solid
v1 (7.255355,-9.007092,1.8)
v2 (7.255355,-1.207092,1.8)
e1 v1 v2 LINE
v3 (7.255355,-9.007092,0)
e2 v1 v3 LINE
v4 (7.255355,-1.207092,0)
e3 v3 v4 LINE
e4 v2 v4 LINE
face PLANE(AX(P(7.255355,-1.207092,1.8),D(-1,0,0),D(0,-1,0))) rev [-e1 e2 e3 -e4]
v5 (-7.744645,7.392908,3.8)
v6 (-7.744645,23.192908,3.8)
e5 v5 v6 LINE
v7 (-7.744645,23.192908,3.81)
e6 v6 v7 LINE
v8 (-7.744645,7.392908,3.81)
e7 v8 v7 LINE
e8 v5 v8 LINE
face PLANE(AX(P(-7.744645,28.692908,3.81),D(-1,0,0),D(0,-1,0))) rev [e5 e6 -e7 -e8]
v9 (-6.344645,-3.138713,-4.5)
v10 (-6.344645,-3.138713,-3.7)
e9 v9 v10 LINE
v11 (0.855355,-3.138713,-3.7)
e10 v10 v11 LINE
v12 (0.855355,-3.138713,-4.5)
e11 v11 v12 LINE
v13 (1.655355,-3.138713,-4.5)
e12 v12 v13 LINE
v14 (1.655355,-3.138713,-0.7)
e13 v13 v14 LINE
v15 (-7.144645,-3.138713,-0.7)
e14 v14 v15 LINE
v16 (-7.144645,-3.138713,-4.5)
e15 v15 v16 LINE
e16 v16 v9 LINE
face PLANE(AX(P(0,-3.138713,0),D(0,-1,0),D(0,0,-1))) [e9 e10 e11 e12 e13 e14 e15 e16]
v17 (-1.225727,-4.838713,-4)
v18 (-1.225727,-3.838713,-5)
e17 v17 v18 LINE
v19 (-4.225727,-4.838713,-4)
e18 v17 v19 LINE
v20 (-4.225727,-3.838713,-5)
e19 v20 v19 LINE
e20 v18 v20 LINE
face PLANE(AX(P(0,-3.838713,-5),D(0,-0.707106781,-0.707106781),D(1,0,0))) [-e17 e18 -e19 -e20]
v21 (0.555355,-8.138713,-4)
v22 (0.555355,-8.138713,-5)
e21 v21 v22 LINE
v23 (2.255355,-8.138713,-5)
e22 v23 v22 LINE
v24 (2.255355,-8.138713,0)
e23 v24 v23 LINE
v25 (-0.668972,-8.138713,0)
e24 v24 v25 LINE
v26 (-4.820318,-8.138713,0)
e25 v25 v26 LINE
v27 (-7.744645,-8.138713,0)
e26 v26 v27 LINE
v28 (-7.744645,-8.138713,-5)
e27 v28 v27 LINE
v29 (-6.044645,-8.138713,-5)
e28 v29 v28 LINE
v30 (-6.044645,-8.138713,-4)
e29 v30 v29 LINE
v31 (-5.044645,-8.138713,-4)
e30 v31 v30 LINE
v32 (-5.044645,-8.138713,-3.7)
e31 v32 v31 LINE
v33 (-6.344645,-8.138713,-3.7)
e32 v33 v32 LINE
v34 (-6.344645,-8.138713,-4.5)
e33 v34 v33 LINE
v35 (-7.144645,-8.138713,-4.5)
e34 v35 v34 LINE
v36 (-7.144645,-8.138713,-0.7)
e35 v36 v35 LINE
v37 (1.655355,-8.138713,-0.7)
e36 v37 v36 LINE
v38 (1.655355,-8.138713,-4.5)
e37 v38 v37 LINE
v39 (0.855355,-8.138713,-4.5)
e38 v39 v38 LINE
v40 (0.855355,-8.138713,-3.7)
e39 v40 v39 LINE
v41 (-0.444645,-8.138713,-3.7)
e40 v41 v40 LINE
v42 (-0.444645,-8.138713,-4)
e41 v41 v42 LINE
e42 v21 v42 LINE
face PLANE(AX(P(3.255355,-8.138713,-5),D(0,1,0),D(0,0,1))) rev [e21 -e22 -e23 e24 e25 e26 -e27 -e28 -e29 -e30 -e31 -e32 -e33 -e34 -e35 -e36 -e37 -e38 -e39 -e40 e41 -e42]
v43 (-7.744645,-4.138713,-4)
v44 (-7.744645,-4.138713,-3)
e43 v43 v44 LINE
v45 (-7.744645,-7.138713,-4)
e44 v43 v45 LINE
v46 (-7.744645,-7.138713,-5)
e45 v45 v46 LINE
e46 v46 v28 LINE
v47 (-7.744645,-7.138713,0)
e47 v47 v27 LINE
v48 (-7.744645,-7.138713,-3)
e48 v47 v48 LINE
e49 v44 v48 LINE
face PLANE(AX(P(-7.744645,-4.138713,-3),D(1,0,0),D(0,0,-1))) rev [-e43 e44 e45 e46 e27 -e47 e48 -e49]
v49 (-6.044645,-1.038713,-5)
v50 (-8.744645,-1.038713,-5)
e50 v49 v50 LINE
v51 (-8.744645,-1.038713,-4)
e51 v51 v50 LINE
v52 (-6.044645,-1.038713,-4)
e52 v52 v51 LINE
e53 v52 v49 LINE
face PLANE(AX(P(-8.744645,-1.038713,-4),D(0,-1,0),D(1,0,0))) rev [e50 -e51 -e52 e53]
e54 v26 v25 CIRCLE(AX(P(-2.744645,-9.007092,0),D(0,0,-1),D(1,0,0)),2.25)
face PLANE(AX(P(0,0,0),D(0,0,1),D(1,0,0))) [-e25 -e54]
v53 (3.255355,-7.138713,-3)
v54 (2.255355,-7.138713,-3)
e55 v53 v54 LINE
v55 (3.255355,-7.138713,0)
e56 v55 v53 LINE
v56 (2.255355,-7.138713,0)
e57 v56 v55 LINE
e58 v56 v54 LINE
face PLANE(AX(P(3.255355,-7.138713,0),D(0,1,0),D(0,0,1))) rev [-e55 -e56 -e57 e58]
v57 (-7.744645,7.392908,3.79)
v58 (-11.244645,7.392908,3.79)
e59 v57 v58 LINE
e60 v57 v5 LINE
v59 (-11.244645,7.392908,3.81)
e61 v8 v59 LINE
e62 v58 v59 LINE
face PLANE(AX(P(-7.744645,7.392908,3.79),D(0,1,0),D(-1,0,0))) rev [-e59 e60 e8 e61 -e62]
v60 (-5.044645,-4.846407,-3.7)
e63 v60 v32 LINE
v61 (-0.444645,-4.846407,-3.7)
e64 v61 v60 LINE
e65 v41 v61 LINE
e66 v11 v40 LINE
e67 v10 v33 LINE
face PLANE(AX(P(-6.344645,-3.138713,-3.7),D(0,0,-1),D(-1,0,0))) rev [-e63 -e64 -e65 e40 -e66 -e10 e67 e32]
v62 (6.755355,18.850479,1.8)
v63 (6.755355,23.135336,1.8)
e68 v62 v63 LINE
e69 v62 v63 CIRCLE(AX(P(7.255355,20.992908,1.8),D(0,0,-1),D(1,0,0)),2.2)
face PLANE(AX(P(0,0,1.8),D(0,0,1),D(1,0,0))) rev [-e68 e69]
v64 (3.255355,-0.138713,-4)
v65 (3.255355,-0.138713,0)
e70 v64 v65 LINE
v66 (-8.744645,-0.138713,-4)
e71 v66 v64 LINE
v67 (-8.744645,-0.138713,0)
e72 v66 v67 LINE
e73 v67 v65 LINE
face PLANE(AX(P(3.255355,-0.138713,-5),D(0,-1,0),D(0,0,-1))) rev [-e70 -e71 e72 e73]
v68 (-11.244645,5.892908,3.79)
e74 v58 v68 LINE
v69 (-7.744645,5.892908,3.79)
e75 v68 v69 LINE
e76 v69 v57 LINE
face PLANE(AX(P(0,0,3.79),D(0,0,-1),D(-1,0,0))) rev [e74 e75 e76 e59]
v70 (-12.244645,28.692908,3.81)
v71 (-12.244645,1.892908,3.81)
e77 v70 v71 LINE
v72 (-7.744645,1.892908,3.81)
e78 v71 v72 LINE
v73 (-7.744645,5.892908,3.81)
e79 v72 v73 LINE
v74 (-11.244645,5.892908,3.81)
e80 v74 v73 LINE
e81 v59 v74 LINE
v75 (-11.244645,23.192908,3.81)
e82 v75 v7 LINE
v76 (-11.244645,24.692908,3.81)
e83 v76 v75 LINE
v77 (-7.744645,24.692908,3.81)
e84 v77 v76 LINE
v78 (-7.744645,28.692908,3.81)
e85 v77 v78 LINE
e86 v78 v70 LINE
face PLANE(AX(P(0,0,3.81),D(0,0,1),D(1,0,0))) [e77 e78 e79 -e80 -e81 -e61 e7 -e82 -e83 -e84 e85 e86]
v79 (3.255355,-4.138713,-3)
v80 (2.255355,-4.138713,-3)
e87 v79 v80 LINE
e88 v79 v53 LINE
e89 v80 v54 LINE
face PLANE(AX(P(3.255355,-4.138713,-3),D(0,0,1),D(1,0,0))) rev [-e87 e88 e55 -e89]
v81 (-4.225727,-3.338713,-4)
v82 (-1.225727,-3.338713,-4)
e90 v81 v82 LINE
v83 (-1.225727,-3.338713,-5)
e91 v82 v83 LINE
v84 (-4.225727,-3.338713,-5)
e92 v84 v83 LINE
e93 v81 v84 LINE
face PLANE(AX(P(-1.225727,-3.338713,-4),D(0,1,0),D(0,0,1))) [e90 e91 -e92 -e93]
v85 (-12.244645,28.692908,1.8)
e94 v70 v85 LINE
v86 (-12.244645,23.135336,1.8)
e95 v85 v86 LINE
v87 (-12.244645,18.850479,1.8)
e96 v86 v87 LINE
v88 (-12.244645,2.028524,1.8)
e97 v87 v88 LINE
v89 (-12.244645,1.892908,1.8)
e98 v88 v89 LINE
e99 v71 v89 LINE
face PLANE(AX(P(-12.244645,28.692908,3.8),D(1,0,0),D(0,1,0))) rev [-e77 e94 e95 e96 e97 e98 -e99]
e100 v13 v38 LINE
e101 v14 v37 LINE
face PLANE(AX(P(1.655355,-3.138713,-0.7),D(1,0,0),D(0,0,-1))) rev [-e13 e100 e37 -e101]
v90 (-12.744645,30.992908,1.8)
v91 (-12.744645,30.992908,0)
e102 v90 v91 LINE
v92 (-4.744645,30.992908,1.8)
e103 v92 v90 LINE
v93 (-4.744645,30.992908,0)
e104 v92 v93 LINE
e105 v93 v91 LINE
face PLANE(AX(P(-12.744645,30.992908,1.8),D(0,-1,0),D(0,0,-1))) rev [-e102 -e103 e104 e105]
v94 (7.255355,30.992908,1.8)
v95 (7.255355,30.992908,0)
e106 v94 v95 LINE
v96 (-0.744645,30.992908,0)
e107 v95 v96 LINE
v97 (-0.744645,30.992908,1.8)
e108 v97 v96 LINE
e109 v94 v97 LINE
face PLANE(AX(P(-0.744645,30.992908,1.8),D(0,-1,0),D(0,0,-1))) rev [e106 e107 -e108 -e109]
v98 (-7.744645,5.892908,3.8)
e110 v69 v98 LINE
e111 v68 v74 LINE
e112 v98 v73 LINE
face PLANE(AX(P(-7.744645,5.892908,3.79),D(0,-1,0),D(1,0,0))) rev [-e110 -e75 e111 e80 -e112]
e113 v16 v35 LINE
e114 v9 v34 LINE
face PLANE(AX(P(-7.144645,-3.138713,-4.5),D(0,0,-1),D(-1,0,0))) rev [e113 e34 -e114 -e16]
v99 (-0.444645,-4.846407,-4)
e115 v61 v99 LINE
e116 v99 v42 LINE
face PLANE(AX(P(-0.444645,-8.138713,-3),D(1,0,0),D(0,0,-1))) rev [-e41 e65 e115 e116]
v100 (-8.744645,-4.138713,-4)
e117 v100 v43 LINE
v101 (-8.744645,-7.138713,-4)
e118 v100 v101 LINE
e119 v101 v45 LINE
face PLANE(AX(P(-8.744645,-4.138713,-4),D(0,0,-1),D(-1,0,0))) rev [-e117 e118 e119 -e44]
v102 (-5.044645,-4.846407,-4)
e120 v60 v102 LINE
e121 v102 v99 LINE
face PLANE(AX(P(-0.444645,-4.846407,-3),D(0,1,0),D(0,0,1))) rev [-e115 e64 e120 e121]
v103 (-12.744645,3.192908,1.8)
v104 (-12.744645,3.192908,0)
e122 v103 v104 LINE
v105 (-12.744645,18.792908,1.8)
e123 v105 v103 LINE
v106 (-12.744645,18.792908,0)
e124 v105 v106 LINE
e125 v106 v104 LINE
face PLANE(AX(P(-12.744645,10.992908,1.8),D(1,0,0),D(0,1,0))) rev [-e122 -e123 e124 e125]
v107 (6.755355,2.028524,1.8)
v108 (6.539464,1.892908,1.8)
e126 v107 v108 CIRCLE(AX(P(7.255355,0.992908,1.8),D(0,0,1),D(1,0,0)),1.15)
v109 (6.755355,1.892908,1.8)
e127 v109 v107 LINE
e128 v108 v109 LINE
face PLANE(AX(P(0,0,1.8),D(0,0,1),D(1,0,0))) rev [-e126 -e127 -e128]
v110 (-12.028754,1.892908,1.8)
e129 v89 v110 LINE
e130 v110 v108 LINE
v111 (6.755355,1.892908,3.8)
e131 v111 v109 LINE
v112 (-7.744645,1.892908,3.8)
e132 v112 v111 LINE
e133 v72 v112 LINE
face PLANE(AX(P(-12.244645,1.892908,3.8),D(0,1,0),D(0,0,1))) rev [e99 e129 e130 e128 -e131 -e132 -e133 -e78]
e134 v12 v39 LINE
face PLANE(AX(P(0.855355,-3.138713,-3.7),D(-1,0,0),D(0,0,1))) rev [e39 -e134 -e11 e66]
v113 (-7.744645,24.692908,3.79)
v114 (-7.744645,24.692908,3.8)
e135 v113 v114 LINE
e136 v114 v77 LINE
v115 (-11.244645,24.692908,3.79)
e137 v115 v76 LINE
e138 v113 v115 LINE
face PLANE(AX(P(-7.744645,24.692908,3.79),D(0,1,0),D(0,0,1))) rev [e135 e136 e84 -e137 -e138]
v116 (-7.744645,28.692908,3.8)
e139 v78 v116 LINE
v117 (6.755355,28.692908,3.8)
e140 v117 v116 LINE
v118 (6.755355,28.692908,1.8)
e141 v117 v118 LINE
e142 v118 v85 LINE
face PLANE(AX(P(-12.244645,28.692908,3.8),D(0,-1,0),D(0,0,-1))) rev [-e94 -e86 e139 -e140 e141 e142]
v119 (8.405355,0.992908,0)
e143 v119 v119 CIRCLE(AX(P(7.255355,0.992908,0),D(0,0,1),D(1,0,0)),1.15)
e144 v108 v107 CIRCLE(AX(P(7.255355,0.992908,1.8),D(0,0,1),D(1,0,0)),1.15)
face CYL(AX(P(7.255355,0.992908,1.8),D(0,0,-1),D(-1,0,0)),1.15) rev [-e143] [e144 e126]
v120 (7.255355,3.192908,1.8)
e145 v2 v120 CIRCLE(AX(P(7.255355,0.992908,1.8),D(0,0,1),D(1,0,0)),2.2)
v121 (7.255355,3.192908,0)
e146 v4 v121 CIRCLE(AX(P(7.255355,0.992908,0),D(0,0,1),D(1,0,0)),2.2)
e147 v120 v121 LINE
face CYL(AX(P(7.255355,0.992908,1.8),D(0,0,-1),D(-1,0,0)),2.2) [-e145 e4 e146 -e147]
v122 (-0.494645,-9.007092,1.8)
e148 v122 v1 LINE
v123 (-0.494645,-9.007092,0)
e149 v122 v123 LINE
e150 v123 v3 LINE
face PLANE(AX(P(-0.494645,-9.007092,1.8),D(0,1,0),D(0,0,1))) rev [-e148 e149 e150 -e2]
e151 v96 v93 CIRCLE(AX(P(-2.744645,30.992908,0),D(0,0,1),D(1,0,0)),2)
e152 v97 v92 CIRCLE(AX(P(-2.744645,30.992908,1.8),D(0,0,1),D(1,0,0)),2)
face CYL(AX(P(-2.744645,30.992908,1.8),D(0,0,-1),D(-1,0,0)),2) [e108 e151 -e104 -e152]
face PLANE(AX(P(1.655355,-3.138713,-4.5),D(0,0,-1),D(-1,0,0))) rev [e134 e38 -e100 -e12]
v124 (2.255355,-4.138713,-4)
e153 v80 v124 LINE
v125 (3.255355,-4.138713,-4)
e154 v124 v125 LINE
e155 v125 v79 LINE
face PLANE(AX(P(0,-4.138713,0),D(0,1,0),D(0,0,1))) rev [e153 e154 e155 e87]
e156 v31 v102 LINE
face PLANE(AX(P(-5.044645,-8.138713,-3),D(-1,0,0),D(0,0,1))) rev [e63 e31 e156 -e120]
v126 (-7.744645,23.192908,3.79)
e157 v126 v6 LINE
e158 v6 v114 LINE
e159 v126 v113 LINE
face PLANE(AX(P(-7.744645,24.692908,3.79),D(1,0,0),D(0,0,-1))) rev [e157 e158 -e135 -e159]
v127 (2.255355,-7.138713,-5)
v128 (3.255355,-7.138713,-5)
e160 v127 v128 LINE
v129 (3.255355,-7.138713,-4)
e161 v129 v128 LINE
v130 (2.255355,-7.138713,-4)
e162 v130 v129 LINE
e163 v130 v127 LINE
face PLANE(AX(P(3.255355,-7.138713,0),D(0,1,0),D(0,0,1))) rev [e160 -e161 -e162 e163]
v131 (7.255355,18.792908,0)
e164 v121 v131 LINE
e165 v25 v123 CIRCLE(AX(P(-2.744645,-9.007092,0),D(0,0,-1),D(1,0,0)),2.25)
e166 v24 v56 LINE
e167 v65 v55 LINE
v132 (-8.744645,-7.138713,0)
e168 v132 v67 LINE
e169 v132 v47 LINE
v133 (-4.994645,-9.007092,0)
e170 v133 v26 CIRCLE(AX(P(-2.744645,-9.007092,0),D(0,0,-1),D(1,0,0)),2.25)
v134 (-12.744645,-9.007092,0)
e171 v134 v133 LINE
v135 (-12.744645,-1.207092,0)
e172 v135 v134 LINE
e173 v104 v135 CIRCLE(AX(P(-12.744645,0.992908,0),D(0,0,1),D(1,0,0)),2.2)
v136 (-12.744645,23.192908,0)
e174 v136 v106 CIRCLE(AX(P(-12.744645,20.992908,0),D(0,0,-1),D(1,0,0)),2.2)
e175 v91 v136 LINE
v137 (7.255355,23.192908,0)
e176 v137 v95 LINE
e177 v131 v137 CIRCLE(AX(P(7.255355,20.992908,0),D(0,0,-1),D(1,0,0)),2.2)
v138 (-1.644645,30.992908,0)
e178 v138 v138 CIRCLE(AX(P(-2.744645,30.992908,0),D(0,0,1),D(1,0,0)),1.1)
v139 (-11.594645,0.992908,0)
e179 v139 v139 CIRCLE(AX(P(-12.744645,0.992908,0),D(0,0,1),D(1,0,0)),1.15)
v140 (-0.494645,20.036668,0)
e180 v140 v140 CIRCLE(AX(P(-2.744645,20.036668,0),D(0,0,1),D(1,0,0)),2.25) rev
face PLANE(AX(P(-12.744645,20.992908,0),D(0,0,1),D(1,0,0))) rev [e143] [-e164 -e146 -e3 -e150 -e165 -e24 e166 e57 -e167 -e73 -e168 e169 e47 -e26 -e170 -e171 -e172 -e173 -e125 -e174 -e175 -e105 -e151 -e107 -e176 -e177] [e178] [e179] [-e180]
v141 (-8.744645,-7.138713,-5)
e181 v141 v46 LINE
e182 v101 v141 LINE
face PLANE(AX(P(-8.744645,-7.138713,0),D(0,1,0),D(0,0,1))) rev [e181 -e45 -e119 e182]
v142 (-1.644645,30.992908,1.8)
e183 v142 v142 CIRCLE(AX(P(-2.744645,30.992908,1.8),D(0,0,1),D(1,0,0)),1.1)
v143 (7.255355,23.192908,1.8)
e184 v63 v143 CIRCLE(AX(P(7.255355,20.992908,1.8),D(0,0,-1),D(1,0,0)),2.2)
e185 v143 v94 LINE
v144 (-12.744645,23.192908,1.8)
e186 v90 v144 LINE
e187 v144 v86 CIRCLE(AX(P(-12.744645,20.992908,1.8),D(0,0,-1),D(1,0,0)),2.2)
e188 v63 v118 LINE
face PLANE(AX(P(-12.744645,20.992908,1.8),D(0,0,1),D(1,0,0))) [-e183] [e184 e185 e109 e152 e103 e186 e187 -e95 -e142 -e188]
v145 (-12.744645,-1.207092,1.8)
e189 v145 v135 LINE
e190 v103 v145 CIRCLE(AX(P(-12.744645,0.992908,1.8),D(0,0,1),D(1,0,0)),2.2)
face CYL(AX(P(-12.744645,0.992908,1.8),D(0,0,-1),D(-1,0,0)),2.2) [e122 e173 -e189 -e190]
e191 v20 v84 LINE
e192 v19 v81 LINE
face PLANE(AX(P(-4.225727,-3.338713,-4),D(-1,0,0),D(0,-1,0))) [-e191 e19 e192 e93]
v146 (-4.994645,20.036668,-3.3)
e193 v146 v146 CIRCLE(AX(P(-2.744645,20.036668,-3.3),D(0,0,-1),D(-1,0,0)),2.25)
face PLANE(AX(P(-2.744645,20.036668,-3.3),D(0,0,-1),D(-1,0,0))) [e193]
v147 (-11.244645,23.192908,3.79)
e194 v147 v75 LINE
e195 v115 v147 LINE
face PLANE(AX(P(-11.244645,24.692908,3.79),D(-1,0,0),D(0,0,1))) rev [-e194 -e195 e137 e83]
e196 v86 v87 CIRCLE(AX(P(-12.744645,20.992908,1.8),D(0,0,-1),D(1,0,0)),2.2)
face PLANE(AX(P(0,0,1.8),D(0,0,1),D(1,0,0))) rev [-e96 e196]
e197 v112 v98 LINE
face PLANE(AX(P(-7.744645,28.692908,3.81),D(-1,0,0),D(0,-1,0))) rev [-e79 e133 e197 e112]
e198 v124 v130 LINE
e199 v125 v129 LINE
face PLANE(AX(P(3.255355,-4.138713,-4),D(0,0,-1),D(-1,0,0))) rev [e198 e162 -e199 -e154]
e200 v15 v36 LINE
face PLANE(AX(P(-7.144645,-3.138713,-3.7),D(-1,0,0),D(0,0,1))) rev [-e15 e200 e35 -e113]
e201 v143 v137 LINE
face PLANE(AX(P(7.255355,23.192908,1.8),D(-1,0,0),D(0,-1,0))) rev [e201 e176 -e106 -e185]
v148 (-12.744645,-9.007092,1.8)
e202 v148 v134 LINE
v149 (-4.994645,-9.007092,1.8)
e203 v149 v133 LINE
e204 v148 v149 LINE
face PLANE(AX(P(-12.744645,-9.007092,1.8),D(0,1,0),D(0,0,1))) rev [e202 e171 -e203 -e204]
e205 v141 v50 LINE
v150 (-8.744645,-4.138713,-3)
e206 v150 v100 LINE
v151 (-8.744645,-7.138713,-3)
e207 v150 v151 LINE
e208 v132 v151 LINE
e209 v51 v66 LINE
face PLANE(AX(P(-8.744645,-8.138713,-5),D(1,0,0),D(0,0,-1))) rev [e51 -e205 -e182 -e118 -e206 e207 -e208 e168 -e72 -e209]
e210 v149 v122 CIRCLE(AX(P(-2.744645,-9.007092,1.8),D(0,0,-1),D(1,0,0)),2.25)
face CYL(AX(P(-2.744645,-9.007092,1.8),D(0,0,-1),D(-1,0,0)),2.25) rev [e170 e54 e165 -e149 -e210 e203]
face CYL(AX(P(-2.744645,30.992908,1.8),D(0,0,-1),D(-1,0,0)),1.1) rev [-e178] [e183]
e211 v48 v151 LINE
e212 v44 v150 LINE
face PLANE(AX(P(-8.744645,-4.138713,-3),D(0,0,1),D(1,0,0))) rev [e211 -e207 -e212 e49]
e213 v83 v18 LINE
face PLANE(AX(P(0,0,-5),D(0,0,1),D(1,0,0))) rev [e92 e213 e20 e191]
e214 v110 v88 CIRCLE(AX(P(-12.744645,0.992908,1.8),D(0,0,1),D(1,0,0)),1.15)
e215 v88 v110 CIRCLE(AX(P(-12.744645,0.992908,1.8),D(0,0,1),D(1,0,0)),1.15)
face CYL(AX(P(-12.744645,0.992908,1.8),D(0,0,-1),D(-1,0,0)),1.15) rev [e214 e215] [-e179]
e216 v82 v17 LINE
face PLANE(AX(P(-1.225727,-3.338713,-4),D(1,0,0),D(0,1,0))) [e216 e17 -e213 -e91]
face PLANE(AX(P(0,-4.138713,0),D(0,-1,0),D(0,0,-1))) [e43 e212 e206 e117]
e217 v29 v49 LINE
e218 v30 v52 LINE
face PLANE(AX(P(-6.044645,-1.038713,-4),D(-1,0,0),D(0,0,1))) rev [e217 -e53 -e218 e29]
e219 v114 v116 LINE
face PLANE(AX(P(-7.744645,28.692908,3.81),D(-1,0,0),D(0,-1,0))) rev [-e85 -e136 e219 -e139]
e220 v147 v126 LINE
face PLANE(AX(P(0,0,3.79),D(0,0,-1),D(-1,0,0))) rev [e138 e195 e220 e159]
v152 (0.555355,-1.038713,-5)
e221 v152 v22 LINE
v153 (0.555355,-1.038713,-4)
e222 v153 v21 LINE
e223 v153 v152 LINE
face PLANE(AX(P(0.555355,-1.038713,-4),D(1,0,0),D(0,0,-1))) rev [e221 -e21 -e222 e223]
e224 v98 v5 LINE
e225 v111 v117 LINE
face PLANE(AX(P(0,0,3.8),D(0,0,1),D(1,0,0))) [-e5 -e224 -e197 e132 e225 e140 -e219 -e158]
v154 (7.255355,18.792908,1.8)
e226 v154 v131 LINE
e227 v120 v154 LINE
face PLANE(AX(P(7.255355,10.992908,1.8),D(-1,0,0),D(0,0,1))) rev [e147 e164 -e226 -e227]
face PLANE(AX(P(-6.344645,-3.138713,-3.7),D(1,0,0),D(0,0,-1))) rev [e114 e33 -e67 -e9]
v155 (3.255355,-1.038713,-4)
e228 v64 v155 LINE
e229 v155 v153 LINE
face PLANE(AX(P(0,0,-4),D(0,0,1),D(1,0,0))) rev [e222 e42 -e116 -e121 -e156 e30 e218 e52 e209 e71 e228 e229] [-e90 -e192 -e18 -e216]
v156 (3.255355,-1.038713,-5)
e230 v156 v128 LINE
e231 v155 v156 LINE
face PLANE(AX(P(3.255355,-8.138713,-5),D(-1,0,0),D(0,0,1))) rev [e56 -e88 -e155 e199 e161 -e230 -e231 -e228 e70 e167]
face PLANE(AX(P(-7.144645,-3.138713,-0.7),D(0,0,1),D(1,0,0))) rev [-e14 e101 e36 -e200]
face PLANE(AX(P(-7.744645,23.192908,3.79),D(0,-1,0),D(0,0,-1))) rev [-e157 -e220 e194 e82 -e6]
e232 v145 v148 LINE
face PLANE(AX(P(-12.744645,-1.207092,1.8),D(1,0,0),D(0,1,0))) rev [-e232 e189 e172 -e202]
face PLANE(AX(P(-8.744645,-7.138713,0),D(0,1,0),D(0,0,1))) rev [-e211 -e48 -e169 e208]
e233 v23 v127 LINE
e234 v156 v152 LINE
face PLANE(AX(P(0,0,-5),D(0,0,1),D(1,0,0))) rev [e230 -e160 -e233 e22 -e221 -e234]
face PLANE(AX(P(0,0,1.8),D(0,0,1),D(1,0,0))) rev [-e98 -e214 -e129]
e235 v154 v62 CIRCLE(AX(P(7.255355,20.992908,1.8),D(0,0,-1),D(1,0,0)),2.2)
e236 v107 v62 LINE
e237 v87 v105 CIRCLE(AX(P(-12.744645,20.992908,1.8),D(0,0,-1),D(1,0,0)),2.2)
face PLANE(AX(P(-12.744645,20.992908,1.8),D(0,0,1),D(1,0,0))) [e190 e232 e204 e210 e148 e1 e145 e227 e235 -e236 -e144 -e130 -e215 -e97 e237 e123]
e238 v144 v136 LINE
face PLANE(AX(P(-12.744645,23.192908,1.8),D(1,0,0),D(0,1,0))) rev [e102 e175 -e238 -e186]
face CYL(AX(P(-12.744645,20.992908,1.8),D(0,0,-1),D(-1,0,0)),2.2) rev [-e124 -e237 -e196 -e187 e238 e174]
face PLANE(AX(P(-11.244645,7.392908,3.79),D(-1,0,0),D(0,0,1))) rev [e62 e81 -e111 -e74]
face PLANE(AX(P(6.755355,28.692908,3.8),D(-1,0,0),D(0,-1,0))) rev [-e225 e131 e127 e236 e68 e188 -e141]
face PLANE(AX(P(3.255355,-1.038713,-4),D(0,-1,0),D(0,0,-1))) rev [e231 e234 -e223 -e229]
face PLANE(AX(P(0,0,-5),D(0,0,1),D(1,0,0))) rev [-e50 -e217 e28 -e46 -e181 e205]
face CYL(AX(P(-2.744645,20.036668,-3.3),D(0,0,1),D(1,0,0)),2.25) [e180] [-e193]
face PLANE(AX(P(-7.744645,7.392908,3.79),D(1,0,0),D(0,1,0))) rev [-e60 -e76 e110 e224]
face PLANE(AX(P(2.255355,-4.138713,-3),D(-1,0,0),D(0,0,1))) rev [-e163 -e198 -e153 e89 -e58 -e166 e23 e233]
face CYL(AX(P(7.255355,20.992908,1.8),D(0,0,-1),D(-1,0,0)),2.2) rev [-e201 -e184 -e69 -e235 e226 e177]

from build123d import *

# Parameters (mm, degrees)
ESQUISSE1_R             = 1.15
ESQUISSE1_R_2           = 1.1
BOSS_EXTRU_1_DEPTH      = 1.8
ESQUISSE2_W             = 19
ESQUISSE2_H             = 26.8
BOSS_EXTRU_2_DEPTH      = 2
ESQUISSE3_W             = 4.5
ESQUISSE3_H             = 26.8
BOSS_EXTRU_3_DEPTH      = 0.01
ESQUISSE4_W             = 3.5
ESQUISSE4_H             = 1.5
ENL_V_MAT_EXTRU_1_DEPTH = 0.02
ESQUISSE5_W             = 12
ESQUISSE5_H             = 8
BOSS_EXTRU_4_DEPTH      = 5
ESQUISSE6_W             = 3
ESQUISSE6_H             = 1.5
ENL_V_MAT_EXTRU_2_DEPTH = 1
ESQUISSE8_W             = 4.6
ESQUISSE8_H             = 3.292306134
ENL_V_MAT_EXTRU_3_DEPTH = 1
CHANFREIN1_SIZE         = 1
ENL_V_MAT_EXTRU_4_DEPTH = 5
ESQUISSE10_W            = 1
ESQUISSE10_H            = 1
ENL_V_MAT_EXTRU_5_DEPTH = 4
ESQUISSE11_W            = 1
ESQUISSE11_H            = 1
ENL_V_MAT_EXTRU_7_DEPTH = 5
ESQUISSE12_R            = 2.25
BOSS_EXTRU_5_DEPTH      = 3.3


with BuildPart() as part:
    # Esquisse1 → Boss.-Extru.1 (new body)
    with BuildSketch(Plane.XY):
        with BuildLine():
            Line((-12.744645331, 10.992907801), (-12.744645331, 3.192907801))
            ThreePointArc((-12.744645331, 3.192907801), (-14.944645331, 0.992907801), (-12.744645331, -1.207092199))
            Line((-12.744645331, -1.207092199), (-12.744645331, -9.007092199))
            Line((-12.744645331, -9.007092199), (-4.994645331, -9.007092199))
            ThreePointArc((-4.994645331, -9.007092199), (-2.744645331, -6.757092199), (-0.494645331, -9.007092199))
            Line((-0.494645331, -9.007092199), (7.255354669, -9.007092199))
            Line((7.255354669, -9.007092199), (7.255354669, -1.207092199))
            ThreePointArc((7.255354669, -1.207092199), (9.455354669, 0.992907801), (7.255354669, 3.192907801))
            Line((7.255354669, 3.192907801), (7.255354669, 10.992907801))
            Line((7.255354669, 10.992907801), (7.255354669, 18.792907801))
            ThreePointArc((7.255354669, 18.792907801), (5.055354669, 20.992907801), (7.255354669, 23.192907801))
            Line((7.255354669, 23.192907801), (7.255354669, 30.992907801))
            Line((7.255354669, 30.992907801), (-0.744645331, 30.992907801))
            ThreePointArc((-0.744645331, 30.992907801), (-2.744645331, 32.992907801), (-4.744645331, 30.992907801))
            Line((-4.744645331, 30.992907801), (-12.744645331, 30.992907801))
            Line((-12.744645331, 30.992907801), (-12.744645331, 23.192907801))
            ThreePointArc((-12.744645331, 23.192907801), (-10.544645331, 20.992907801), (-12.744645331, 18.792907801))
            Line((-12.744645331, 18.792907801), (-12.744645331, 10.992907801))
        make_face()
        with Locations((-12.744645331, 0.992907801)):
            Circle(ESQUISSE1_R, mode=Mode.SUBTRACT)
        with Locations((7.255354669, 0.992907801)):
            Circle(ESQUISSE1_R, mode=Mode.SUBTRACT)
        with Locations((-2.744645331, 30.992907801)):
            Circle(ESQUISSE1_R_2, mode=Mode.SUBTRACT)
    extrude(amount=BOSS_EXTRU_1_DEPTH)

    # Esquisse2 → Boss.-Extru.2 (add)
    with BuildSketch(Plane.XY.offset(1.8)):
        with Locations((-2.744645331, 15.292907801)):
            Rectangle(ESQUISSE2_W, ESQUISSE2_H)
    extrude(amount=BOSS_EXTRU_2_DEPTH)

    # Esquisse3 → Boss.-Extru.3 (add)
    with BuildSketch(Plane.XY.offset(3.8)):
        with Locations((-9.994645331, 15.292907801)):
            Rectangle(ESQUISSE3_W, ESQUISSE3_H)
    extrude(amount=BOSS_EXTRU_3_DEPTH)

    # Esquisse4 → Enlèv. mat.-Extru.1 (cut)
    with BuildSketch(Plane.XY.offset(3.81)):
        with Locations((-9.494645331, 23.942907801)):
            Rectangle(ESQUISSE4_W, ESQUISSE4_H)
        with Locations((-9.494645331, 6.642907801)):
            Rectangle(ESQUISSE4_W, ESQUISSE4_H)
    extrude(amount=-ENL_V_MAT_EXTRU_1_DEPTH, mode=Mode.SUBTRACT)

    # Esquisse5 → Boss.-Extru.4 (add)
    with BuildSketch(Plane(origin=(0, 0, 0), x_dir=(-1, 0, 0), z_dir=(0, 0, -1))):
        with Locations((2.744645331, -4.138713158)):
            Rectangle(ESQUISSE5_W, ESQUISSE5_H)
    extrude(amount=BOSS_EXTRU_4_DEPTH)

    # Esquisse6 → Enlèv. mat.-Extru.2 (cut)
    with BuildSketch(Plane(origin=(0, 0, -5), x_dir=(-1, 0, 0), z_dir=(0, 0, -1))):
        Polygon((8.744645331, -0.138713158), (-3.255354669, -0.138713158), (-3.255354669, -1.038713158), (-0.555354669, -1.038713158), (-0.555354669, -8.138713158), (6.044645331, -8.138713158), (6.044645331, -1.038713158), (8.744645331, -1.038713158), align=None)
        with Locations((2.725727115, -4.088713158)):
            Rectangle(ESQUISSE6_W, ESQUISSE6_H, mode=Mode.SUBTRACT)
    extrude(amount=-ENL_V_MAT_EXTRU_2_DEPTH, mode=Mode.SUBTRACT)

    # Esquisse8 → Enlèv. mat.-Extru.3 (cut)
    with BuildSketch(Plane(origin=(0, 0, -4), x_dir=(-1, 0, 0), z_dir=(0, 0, -1))):
        with Locations((2.744645331, -6.492560091)):
            Rectangle(ESQUISSE8_W, ESQUISSE8_H)
    extrude(amount=-ENL_V_MAT_EXTRU_3_DEPTH, mode=Mode.SUBTRACT)

    # Chanfrein1
    chanfrein1_edges = [part.edges().sort_by_distance(p)[0] for p in [
        (-2.725727115, -4.838713158, -5),
    ]]
    chamfer(chanfrein1_edges, length=CHANFREIN1_SIZE - 0.0001)  # a hair under: the kernel refuses the full size

    # Esquisse9 → Enlèv. mat.-Extru.4 (cut)
    with BuildSketch(Plane.XZ.offset(8.138713158)):
        Polygon((-7.144645331, -0.7), (1.655354669, -0.7), (1.655354669, -3.7), (1.655354669, -4.5), (0.855354669, -4.5), (0.855354669, -3.7), (-6.344645331, -3.7), (-6.344645331, -4.5), (-7.144645331, -4.5), (-7.144645331, -3.7), align=None)
    extrude(amount=-ENL_V_MAT_EXTRU_4_DEPTH, mode=Mode.SUBTRACT)

    # Esquisse10 → Enlèv. mat.-Extru.5 (cut)
    with BuildSketch(Plane.XZ.offset(8.138713158)):
        with Locations((-8.244645331, -3.5)):
            Rectangle(ESQUISSE10_W, ESQUISSE10_H)
        with Locations((2.755354669, -3.5)):
            Rectangle(ESQUISSE10_W, ESQUISSE10_H)
    extrude(amount=-ENL_V_MAT_EXTRU_5_DEPTH, mode=Mode.SUBTRACT)

    # Esquisse11 → Enlèv. mat.-Extru.7 (cut)
    with BuildSketch(Plane(origin=(0, 0, -5), x_dir=(-1, 0, 0), z_dir=(0, 0, -1))):
        with Locations((-2.755354669, -7.638713158)):
            Rectangle(ESQUISSE11_W, ESQUISSE11_H)
        with Locations((8.244645331, -7.638713158)):
            Rectangle(ESQUISSE11_W, ESQUISSE11_H)
    extrude(amount=-ENL_V_MAT_EXTRU_7_DEPTH, mode=Mode.SUBTRACT)

    # Esquisse12 → Boss.-Extru.5 (add)
    with BuildSketch(Plane(origin=(0, 0, 0), x_dir=(-1, 0, 0), z_dir=(0, 0, -1))):
        with Locations(Location((2.744645331, 20.036668052, 0), (0, 0, 180))):
            Circle(ESQUISSE12_R)
    extrude(amount=BOSS_EXTRU_5_DEPTH)


solid = part.part
